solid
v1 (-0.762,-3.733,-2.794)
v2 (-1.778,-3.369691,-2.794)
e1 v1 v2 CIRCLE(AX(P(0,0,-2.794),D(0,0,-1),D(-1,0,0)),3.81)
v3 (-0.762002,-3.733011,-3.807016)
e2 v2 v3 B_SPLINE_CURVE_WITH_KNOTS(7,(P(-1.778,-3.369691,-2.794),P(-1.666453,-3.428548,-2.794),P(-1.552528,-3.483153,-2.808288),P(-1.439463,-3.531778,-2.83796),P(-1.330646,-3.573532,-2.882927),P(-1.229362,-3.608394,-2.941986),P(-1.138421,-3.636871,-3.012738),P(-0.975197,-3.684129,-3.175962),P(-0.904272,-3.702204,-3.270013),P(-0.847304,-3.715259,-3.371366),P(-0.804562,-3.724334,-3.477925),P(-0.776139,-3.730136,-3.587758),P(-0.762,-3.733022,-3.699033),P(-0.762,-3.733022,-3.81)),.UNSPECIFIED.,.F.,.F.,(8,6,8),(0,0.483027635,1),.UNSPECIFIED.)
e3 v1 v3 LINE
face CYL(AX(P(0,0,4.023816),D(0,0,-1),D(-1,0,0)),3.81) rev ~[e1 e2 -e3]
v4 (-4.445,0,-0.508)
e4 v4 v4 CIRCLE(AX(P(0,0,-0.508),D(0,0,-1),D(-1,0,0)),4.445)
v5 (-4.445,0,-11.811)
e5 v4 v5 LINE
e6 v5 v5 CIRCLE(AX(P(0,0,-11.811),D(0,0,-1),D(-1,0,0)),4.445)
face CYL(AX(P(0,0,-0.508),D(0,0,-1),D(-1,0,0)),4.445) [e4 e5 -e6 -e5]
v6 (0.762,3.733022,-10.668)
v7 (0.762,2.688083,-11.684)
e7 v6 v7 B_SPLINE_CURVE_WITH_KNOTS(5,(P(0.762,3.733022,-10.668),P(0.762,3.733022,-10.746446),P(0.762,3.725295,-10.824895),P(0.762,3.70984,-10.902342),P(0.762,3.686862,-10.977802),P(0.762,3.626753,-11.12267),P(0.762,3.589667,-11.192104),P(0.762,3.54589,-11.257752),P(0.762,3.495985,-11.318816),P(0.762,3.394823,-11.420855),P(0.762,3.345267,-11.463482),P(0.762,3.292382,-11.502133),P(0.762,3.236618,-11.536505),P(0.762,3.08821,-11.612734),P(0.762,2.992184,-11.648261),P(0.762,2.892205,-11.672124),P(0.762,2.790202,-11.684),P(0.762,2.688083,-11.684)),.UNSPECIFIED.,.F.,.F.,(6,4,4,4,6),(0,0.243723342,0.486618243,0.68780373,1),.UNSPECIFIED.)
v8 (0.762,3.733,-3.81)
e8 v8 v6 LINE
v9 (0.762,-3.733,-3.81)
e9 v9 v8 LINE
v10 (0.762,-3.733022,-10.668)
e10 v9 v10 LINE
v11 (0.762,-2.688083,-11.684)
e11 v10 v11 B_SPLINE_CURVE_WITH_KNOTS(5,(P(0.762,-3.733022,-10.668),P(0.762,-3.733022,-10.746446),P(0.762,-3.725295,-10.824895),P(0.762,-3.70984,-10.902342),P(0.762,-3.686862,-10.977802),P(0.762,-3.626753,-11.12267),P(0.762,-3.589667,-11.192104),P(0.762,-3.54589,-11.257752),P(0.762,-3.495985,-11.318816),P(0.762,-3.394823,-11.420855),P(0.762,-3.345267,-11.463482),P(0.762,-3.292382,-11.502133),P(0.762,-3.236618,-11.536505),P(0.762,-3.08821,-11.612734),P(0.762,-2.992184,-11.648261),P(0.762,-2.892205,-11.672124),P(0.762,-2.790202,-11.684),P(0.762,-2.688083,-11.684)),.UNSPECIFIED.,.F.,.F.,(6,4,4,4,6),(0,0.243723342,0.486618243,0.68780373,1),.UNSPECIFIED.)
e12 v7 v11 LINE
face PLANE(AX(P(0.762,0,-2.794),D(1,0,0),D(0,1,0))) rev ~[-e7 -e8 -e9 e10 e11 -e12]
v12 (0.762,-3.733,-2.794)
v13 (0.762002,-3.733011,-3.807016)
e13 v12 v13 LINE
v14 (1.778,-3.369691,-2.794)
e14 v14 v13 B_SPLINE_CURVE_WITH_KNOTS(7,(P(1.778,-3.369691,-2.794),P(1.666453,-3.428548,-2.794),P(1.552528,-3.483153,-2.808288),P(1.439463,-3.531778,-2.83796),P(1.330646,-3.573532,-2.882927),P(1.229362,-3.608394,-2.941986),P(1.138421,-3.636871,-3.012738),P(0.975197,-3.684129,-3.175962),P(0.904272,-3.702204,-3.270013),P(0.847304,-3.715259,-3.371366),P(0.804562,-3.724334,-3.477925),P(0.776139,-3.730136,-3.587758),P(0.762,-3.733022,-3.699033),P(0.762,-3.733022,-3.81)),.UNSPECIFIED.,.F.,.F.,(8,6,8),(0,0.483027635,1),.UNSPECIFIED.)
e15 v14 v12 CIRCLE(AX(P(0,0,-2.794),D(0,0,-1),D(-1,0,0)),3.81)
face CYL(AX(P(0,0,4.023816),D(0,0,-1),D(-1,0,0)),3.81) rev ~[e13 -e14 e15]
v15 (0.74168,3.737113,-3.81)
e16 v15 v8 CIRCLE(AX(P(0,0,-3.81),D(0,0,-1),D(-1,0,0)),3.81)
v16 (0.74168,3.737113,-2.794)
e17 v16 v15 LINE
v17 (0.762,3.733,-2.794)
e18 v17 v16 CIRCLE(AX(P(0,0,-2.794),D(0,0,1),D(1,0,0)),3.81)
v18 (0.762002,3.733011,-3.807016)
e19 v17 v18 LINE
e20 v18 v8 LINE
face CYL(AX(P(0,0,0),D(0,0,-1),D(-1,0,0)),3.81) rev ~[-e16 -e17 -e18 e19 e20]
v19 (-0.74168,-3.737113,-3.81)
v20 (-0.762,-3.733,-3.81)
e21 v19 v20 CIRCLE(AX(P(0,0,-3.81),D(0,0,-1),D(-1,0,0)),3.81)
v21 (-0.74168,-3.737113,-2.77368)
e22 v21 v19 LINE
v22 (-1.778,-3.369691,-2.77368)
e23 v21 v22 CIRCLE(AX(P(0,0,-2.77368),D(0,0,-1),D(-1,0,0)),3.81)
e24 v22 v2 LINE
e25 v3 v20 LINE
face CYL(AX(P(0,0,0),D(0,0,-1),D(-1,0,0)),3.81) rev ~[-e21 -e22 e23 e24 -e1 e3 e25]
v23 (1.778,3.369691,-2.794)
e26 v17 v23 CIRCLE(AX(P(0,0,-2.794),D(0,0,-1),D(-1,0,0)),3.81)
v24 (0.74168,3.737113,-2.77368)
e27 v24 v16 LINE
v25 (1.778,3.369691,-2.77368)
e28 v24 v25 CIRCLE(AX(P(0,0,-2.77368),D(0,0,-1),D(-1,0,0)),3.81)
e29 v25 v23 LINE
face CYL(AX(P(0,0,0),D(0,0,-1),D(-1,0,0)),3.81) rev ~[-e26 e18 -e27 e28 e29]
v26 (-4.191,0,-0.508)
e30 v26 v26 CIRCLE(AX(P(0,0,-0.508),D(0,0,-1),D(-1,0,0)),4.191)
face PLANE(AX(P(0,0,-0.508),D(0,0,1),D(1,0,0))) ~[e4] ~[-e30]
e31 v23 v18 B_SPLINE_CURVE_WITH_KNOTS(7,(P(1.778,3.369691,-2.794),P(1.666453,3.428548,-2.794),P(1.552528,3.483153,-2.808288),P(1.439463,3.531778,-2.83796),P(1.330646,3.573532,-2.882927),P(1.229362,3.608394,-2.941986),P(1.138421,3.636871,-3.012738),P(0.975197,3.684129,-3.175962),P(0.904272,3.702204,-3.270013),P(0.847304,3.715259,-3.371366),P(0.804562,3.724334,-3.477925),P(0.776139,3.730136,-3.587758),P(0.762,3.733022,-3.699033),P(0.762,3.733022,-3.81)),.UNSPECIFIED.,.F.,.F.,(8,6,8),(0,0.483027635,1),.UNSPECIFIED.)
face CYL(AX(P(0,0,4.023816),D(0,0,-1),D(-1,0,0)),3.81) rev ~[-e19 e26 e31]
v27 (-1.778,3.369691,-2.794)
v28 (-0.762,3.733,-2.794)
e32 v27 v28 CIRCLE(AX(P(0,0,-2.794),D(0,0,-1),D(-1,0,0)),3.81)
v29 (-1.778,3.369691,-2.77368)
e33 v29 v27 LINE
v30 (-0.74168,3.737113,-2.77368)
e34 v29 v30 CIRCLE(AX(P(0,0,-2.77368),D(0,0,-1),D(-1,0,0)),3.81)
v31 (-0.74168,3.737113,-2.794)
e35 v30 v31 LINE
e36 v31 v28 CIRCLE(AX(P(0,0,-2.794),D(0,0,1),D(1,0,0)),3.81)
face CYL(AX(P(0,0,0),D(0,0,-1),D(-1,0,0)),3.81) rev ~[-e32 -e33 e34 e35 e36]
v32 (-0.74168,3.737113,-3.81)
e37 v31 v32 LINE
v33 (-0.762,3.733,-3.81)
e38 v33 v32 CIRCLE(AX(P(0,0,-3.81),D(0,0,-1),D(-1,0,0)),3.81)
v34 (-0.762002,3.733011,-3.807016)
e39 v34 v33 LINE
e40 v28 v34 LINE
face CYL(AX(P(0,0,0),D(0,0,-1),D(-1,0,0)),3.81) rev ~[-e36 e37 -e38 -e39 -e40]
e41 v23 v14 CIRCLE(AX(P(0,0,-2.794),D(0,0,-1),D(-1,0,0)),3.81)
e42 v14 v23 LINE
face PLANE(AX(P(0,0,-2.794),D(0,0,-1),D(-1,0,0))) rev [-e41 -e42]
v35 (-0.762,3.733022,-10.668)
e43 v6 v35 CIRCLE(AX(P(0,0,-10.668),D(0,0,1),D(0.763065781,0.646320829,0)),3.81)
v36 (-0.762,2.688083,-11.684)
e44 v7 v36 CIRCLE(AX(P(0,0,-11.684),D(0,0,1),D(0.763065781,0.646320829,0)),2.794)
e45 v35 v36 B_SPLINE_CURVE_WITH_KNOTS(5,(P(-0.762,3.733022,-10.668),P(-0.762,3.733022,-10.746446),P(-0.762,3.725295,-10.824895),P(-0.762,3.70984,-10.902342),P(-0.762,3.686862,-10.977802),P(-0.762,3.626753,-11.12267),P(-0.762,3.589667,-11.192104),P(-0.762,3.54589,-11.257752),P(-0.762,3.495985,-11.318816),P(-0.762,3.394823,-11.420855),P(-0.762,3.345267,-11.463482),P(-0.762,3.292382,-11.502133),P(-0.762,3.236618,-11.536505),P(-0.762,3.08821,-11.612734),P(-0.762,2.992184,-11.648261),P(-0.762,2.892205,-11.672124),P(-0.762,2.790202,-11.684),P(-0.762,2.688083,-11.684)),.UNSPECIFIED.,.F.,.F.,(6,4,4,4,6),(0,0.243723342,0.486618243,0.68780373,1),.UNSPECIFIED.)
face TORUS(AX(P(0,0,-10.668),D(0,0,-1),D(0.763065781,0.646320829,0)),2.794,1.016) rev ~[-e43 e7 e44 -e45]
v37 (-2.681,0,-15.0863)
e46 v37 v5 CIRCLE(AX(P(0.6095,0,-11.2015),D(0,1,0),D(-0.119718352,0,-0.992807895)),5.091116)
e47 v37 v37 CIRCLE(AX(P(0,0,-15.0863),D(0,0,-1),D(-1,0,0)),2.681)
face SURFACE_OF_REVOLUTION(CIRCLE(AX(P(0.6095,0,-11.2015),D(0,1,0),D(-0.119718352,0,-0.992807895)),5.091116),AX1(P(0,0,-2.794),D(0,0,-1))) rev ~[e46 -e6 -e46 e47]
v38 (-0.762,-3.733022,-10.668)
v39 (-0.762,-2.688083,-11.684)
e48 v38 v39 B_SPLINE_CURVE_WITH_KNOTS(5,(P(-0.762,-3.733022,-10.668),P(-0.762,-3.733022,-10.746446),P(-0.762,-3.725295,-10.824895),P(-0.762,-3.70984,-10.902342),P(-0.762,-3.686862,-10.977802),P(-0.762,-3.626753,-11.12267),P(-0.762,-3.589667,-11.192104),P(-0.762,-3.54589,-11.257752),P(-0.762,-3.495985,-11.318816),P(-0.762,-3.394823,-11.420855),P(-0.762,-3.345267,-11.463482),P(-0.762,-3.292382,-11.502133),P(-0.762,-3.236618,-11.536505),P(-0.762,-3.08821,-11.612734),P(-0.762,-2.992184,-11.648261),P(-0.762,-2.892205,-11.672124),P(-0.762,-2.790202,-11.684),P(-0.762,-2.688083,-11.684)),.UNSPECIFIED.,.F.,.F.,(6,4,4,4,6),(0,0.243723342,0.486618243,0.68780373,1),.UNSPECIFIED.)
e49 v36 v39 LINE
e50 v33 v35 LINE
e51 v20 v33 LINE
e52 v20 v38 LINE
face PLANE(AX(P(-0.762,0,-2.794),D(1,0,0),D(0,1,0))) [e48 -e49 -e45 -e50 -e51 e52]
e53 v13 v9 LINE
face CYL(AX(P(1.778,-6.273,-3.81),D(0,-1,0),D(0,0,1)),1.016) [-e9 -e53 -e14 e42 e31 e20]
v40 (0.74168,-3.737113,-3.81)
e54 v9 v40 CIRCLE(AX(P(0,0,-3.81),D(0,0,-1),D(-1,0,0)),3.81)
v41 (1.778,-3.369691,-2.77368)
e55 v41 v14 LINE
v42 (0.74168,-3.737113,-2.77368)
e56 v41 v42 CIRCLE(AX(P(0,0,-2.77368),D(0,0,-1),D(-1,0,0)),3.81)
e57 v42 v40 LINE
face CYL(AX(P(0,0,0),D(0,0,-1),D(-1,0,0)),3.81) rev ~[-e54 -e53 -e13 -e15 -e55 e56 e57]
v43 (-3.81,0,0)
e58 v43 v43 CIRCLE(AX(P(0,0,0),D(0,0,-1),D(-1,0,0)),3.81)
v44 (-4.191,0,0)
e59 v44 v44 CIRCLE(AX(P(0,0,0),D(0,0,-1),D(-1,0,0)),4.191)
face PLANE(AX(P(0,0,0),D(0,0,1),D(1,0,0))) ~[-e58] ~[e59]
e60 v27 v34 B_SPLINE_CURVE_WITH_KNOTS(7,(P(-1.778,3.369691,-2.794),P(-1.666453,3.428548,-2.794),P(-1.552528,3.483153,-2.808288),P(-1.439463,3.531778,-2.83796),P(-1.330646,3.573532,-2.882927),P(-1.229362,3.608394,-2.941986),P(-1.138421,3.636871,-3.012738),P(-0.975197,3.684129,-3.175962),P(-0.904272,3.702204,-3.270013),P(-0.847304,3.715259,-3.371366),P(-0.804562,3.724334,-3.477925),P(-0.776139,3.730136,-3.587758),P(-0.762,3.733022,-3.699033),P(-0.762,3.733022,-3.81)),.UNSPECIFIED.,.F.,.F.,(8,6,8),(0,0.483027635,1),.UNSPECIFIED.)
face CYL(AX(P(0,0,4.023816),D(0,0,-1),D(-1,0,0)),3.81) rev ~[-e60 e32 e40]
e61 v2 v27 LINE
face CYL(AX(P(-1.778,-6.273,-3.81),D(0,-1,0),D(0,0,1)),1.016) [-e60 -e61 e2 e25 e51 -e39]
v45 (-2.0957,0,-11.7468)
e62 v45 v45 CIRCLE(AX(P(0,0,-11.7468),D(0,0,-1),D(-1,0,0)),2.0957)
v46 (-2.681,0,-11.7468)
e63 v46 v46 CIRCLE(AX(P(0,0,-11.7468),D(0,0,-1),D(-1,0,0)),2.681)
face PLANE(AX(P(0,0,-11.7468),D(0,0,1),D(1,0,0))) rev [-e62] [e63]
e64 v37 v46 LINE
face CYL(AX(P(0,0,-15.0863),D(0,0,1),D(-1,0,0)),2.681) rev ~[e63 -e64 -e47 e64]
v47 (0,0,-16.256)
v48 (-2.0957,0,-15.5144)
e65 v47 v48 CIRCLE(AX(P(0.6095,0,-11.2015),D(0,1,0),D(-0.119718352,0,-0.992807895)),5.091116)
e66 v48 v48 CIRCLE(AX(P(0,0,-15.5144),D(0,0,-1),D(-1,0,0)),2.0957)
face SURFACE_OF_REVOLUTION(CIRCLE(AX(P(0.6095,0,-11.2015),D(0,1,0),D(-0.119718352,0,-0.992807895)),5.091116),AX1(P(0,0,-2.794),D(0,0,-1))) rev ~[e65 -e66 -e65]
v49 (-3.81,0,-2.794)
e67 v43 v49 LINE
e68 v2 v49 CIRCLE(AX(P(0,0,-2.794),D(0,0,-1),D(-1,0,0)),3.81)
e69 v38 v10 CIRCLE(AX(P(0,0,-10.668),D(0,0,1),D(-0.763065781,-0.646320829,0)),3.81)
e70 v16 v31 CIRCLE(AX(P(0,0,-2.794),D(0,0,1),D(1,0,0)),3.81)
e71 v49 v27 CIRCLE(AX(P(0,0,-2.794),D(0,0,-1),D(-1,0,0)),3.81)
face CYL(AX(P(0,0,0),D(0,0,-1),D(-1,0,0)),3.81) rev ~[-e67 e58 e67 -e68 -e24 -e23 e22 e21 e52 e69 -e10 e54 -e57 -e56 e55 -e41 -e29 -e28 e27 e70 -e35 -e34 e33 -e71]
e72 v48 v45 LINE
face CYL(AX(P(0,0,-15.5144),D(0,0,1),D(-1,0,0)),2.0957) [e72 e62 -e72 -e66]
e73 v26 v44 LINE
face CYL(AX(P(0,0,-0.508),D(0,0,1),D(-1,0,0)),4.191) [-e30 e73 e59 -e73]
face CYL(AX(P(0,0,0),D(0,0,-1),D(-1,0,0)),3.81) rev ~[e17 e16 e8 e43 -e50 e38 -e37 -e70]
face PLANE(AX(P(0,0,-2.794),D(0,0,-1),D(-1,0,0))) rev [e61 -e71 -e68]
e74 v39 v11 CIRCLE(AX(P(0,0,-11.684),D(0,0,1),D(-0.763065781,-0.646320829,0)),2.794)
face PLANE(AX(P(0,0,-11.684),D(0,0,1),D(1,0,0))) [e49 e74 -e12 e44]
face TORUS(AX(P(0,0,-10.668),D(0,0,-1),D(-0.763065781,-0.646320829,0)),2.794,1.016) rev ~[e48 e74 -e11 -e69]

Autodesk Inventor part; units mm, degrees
ref_plane "YZ Plane" through (0, 0, 0) normal (1, 0, 0) x (0, 1, 0)
ref_plane "XZ Plane" through (0, 0, 0) normal (0, 1, 0) x (-1, 0, 0)
ref_plane "XY Plane" through (0, 0, 0) normal (0, 0, 1) x (1, 0, 0)
sketch "Sketch1" plane through (0, 0, 0) normal (0, 1, 0) x (-1, 0, 0)
  line L0 (0, 0) -> (0, -16.256)
  line L1 (0, -16.256) -> (0, -11.811)
  arc A0 (0, -16.256) -> (4.445, -11.811) centre (-0.6095, -11.2015) ccw
  line L2 (0, -16.256) -> (0, -15.3712)
  line L3 (0, -15.3712) -> (0, -14.8015)
  line L4 (4.445, -11.811) -> (4.445, -8.128)
  line L5 (0, 0) -> (0, -2.794)
  line L6 (0, -2.794) -> (4.445, -2.794)
  line L7 (4.445, -2.794) -> (4.445, -8.128)
  line L8 (0, 0) -> (0, -0.508)
  line L9 (4.445, -0.508) -> (4.445, -2.794)
  line L10 (4.445, -0.508) -> (4.191, -0.508)
  line L11 (4.191, -0.508) -> (4.191, 0)
  line L12 (4.191, 0) -> (3.81, 0)
  line L13 (3.81, 0) -> (3.81, -2.794)
  line L14 (4.191, -0.508) -> (4.191, -2.794)
  line L15 (2.0957, -15.5144) -> (2.0957, -11.7468)
  line L16 (2.681, -15.0863) -> (2.681, -11.7468)
  line L17 (2.681, -11.7468) -> (2.0957, -11.7468)
  dimension "d0" = 16.256
  dimension "d2" = 4.445
  dimension "d3" = 2.794
  dimension "d4" = 0.508
  dimension "d5" = 0.254
  dimension "d7" = 0.381
revolve "Revolution1" add sketch "Sketch1" angle 360 about axis through (0, 0, 0) along (0, 0, -1) contours L6 L7 L4 A0 L16 L17 L15 L0 | L13 L12 L11 L14 L6 | L14 L10 L9 L6
sketch "Sketch2" plane through (0, 0, -2.794) normal (0, 0, 1) x (1, 0, 0)
  line L0 (0, 0) -> (0.762, 0)
  line L1 (0.762, 0) -> (0.762, 3.733)
  circle A0 centre (0, 0) radius 3.81 projected
  line L2 (0.762, 0) -> (0.762, -3.733)
  line L3 (0, 0) -> (-0.762, 0)
  line L4 (-0.762, 0) -> (-0.762, 3.733)
  line L5 (-0.762, 0) -> (-0.762, -3.733)
  dimension "d9" = 0.762
  dimension "d10" = 0.762
extrude "Extrusion1" cut sketch "Sketch2" against normal blind 8.89 contours L3 L4 A0 L1 L0 | L0 L2 A0 L5 L3
fillet "Fillet1" radius 1.016 6 edges at (-0.762, -1.8665, -2.794) (-0.762, 1.8665, -2.794) (0.762, 1.8665, -2.794) (0.762, -1.8665, -2.794) (0, 3.81, -11.684) (0, -3.81, -11.684)
properties part number "Pencil Cab"
